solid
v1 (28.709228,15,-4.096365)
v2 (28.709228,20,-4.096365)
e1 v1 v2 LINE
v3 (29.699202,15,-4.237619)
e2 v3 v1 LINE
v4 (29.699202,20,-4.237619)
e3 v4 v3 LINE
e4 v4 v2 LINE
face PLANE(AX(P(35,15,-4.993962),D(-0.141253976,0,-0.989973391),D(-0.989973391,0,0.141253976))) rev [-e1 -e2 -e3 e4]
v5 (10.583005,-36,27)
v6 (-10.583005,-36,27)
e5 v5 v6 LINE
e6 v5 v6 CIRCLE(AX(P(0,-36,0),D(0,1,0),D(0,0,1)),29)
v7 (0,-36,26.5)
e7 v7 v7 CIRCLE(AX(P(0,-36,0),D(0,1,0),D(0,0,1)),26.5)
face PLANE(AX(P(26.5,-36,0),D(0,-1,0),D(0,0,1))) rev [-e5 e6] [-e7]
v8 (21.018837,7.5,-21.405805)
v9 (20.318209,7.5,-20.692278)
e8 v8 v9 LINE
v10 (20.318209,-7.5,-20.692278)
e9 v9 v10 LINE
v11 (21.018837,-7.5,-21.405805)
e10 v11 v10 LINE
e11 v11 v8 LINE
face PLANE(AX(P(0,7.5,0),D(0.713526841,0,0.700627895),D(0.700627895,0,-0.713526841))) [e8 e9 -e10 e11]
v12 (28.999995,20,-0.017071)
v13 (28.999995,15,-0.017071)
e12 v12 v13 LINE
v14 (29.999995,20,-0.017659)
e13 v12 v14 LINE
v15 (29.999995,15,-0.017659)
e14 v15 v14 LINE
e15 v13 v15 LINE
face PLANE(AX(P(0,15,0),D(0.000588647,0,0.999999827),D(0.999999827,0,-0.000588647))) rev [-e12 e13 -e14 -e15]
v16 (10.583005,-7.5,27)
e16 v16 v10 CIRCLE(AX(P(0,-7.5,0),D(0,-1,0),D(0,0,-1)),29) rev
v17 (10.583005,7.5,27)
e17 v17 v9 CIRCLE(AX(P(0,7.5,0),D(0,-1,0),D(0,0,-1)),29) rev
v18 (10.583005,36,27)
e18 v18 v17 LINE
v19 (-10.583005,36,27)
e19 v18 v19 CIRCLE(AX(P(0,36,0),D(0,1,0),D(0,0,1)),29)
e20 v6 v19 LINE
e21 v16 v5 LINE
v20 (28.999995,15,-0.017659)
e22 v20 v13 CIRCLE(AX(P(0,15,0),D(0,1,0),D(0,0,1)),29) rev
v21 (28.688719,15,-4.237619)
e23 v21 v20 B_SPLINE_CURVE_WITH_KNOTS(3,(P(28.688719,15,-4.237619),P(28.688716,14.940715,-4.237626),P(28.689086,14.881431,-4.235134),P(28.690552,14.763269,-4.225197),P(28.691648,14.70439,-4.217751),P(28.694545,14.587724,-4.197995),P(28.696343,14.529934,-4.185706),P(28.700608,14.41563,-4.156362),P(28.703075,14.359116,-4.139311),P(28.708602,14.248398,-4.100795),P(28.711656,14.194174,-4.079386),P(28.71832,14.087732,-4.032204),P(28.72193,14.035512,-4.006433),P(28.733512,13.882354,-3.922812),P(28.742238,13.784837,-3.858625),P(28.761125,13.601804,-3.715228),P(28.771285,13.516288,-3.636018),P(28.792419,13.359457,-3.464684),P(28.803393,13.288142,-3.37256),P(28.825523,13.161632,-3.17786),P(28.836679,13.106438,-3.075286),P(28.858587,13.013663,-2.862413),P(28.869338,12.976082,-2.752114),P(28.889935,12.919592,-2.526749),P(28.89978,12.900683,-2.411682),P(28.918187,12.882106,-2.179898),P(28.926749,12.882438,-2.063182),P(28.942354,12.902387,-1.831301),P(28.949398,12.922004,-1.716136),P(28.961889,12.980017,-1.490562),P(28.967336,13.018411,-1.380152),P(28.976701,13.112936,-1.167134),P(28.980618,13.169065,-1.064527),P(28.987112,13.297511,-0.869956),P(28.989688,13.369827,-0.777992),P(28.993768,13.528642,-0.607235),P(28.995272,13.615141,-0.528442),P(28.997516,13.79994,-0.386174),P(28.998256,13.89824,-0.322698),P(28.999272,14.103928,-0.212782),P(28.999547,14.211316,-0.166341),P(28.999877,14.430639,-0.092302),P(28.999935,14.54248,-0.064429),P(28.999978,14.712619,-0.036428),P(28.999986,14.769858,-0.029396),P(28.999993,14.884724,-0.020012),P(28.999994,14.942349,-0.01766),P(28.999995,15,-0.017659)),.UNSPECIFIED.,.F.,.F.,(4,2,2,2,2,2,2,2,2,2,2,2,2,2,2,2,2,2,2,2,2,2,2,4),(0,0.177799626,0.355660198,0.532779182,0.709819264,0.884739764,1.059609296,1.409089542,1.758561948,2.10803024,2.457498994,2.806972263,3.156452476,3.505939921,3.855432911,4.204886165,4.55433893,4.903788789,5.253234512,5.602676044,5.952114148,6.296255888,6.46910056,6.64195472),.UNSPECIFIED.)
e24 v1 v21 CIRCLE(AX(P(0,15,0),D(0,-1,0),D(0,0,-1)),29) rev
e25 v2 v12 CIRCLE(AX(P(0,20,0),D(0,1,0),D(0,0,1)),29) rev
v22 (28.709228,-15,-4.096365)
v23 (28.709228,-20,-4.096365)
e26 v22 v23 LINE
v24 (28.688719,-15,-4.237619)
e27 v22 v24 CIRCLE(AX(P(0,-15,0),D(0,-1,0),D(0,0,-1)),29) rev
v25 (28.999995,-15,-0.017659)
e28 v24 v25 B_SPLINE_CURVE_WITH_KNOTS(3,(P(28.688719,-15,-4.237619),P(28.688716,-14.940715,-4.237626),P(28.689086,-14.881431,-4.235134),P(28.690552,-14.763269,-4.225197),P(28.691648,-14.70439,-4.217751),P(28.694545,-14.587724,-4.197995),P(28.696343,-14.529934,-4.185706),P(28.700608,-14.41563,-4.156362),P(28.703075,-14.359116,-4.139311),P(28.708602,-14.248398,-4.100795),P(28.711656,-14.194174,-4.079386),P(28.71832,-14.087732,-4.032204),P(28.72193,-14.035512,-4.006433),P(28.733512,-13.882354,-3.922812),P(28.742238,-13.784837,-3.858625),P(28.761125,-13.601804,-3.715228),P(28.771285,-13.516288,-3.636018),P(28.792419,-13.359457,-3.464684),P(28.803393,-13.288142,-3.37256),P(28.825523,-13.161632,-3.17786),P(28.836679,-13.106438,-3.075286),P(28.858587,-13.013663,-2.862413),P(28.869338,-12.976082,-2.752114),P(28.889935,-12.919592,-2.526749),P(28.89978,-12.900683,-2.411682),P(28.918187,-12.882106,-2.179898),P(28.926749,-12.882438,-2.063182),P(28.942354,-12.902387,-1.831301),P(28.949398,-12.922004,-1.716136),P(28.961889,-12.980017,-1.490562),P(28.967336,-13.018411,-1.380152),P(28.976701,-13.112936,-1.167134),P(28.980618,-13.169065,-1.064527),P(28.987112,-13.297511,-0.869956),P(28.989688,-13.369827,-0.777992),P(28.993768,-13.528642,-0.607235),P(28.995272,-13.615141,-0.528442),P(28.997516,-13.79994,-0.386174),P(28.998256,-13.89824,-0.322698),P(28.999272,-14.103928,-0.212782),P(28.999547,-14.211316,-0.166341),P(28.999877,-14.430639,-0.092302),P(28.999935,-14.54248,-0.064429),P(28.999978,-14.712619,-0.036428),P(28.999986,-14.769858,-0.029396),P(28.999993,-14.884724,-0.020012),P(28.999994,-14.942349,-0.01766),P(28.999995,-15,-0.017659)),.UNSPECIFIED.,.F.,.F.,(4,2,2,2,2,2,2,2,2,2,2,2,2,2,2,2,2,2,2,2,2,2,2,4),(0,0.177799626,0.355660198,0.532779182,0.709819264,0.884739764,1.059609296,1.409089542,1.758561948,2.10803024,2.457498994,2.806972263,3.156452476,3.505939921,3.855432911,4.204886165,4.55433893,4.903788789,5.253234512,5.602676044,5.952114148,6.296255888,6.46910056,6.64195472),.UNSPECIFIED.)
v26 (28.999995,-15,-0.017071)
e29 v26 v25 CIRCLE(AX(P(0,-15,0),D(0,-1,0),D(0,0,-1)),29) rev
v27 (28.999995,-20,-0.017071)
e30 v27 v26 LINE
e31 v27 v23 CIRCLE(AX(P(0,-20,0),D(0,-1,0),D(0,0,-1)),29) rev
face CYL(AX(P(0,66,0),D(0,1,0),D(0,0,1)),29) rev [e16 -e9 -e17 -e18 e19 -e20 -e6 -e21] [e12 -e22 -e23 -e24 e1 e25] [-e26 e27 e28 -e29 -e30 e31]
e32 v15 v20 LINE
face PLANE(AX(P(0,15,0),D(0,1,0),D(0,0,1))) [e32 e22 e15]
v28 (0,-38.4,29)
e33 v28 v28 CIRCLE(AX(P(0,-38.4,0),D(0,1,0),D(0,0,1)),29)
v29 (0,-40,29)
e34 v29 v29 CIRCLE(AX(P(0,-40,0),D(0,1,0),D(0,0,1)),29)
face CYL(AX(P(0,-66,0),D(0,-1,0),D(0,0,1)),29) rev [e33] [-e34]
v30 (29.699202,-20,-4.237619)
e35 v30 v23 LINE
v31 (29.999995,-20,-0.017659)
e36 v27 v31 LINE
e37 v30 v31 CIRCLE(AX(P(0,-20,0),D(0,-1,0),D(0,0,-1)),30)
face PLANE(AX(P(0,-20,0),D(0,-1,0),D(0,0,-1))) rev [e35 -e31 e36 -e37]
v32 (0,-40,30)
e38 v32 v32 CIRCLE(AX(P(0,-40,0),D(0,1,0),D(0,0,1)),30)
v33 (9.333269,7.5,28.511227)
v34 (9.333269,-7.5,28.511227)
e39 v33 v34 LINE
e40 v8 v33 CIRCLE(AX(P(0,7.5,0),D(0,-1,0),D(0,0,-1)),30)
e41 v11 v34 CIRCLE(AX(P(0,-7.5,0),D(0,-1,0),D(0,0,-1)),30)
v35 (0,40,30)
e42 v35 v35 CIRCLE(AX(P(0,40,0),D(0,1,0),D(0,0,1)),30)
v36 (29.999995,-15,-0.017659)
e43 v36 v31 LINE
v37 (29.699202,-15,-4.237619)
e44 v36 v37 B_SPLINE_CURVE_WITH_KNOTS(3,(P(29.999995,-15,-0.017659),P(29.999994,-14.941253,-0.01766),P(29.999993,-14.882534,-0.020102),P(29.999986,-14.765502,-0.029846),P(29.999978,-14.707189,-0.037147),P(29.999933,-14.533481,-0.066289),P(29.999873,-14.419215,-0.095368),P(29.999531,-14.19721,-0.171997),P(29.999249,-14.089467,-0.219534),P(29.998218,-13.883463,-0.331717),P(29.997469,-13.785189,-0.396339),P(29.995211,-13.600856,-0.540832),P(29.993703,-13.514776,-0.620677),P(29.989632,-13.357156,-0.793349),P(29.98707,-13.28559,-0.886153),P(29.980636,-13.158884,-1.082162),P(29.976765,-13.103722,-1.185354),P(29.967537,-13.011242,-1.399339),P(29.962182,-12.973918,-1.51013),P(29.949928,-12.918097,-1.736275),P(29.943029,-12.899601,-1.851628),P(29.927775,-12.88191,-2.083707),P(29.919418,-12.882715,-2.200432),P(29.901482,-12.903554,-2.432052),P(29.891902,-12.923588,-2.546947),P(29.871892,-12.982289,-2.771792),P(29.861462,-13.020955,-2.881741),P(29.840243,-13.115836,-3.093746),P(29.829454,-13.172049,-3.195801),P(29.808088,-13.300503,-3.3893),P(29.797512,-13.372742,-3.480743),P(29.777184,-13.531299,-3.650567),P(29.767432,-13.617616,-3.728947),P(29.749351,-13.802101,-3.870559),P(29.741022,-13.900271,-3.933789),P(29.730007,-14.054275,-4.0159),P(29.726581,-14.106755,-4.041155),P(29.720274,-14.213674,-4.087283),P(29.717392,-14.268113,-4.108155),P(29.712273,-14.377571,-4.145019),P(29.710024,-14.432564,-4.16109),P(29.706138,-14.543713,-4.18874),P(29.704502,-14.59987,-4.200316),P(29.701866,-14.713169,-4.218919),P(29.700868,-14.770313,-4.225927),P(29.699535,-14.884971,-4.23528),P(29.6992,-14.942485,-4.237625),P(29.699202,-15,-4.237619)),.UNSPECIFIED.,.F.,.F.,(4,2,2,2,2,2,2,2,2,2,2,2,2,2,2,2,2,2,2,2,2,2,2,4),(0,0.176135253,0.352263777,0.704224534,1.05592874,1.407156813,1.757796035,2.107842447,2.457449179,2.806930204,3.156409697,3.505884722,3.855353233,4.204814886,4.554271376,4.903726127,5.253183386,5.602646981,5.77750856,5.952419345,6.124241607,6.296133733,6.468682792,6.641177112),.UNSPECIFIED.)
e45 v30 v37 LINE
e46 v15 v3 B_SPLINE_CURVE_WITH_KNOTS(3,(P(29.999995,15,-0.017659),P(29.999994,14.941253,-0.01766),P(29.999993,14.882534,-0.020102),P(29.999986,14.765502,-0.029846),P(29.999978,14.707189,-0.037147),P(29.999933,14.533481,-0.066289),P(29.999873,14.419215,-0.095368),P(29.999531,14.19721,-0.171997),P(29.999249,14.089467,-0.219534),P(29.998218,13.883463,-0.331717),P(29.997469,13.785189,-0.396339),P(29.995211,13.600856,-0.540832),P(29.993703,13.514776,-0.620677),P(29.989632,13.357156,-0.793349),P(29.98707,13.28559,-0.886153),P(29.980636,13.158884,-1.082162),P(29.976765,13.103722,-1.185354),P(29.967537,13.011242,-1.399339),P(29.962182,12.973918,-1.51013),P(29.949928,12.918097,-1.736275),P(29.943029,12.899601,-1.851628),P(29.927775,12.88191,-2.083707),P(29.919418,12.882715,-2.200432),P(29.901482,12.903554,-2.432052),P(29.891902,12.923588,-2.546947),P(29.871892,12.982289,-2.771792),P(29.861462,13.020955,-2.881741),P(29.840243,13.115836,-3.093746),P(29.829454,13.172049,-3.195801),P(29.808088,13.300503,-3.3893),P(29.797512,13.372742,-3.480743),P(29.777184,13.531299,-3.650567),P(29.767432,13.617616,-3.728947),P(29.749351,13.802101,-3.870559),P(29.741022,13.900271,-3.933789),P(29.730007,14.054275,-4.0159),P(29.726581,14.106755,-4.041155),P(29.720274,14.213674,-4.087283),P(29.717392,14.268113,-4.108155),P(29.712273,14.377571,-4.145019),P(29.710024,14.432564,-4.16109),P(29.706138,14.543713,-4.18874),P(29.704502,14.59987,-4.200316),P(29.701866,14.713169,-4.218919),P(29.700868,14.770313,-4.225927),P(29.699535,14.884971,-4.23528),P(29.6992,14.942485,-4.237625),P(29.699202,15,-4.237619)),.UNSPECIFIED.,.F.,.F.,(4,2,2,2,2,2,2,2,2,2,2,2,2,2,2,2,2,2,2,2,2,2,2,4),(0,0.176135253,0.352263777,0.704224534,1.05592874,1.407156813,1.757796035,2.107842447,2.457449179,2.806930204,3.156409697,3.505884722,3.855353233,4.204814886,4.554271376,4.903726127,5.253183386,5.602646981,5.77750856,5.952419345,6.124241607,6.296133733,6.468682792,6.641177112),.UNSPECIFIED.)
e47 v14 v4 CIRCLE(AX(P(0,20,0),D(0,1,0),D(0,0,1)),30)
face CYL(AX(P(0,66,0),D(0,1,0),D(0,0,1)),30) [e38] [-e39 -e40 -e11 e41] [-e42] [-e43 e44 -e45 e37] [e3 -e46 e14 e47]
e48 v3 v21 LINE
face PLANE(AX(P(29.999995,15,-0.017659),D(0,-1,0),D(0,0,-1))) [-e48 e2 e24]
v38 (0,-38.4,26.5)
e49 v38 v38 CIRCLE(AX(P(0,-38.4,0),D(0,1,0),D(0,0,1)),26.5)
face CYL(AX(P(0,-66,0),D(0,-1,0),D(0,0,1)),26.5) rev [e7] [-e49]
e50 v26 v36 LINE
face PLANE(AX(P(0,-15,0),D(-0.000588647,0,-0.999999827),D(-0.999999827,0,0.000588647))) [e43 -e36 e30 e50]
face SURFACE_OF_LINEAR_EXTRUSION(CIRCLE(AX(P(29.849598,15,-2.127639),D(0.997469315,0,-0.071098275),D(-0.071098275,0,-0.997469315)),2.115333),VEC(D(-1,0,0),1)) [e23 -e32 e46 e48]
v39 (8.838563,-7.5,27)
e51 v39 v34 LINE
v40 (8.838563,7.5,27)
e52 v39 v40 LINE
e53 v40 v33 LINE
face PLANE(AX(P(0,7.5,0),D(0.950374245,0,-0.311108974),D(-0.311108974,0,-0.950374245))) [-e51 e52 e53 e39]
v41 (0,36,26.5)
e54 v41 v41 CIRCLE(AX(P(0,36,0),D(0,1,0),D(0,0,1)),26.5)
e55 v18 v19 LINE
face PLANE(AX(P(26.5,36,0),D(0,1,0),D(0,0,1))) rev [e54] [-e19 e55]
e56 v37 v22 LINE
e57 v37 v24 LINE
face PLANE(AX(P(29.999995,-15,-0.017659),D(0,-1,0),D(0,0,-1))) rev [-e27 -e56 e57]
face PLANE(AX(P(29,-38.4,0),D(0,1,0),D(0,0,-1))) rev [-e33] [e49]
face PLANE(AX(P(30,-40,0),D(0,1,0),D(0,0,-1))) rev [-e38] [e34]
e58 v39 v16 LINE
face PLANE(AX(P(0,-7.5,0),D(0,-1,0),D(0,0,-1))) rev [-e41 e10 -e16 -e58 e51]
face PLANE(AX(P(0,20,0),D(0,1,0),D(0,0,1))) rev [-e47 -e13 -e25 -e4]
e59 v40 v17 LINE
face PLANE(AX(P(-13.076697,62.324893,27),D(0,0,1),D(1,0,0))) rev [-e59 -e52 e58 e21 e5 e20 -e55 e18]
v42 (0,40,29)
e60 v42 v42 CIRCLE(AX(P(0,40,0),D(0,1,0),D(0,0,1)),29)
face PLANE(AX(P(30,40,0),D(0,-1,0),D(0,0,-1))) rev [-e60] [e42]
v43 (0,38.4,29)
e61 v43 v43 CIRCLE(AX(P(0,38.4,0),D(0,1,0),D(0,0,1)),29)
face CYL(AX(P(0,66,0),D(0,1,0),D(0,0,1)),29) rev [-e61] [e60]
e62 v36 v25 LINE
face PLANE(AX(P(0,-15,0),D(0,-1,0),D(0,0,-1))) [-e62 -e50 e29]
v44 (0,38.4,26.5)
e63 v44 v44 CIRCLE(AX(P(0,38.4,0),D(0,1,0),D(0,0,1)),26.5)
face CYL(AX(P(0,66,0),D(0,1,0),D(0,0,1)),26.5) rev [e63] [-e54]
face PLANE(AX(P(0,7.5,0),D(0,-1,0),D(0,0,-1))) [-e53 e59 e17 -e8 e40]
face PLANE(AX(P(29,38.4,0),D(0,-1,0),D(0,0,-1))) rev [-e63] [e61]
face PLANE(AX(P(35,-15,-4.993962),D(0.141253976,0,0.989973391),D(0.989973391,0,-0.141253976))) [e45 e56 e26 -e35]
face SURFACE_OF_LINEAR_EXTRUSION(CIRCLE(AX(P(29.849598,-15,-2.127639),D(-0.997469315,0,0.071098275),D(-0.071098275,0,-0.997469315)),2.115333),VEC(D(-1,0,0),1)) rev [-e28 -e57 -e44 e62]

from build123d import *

# Parameters (mm, degrees)
EXTRUDE_11_REACH             = 60.31
EXTRUDE_11_DIRECTION_2_REACH = 60.31
CUT_EXTRUDE_1_DEPTH          = 7.5
CUT_EXTRUDE_1_DEPTH_BACK     = 7.5
CUT_EXTRUDE_2_DEPTH          = 5
CUT_EXTRUDE_START            = 28.688718626
CUT_EXTRUDE_3_DEPTH          = 1.311276176


# Read off the part's stored shape, not the designer's step: 切除-拉伸3
with BuildPart() as part:
    # 草图1 → 旋转1 (revolve)
    with BuildSketch(Plane.XY, mode=Mode.PRIVATE) as revolve_1_sk:
        Polygon((26.5, 38.4), (26.5, 36), (29, 36), (29, 0), (30, 0), (30, 40), (29, 40), (29, 38.4), align=None)
    revolve_1 = revolve(revolve_1_sk.sketch.rotate(Axis((0, 66, 0), (0, -1, 0)), 90), axis=Axis((0, 66, 0), (0, -1, 0)))

    # 镜向1: 旋转1 across plane
    add(revolve_1.mirror(Plane.ZX))

    # 凸台-拉伸11: up to this face of the body (flat: up to its plane)
    extrude_11_end = Plane(part.part.faces().sort_by_distance((0, 36, -27.320243866))[0])
    # 草图11 → 凸台-拉伸11 (add, up to the picked face)
    with BuildSketch(Plane(origin=(0, 0, 0), x_dir=(1, 0, 0), z_dir=(0, 1, 0)), mode=Mode.PRIVATE) as extrude_11_sk1:
        with BuildLine():
            Line((-13.076696831, -27), (13.076696831, -27))
            ThreePointArc((13.076696831, -27), (0, -30), (-13.076696831, -27))
        make_face()
    extrude_11_tool1 = split(extrude(extrude_11_sk1.sketch, amount=EXTRUDE_11_REACH, mode=Mode.PRIVATE), bisect_by=extrude_11_end, keep=Keep.BOTH, mode=Mode.PRIVATE)
    add(extrude_11_tool1.solids().sort_by(Axis((0, 0, 28.205296), (0, 1, 0)))[0])

    # 凸台-拉伸11 direction 2: up to this face of the body (flat: up to its plane)
    extrude_11_direction_2_end = Plane(part.part.faces().sort_by_distance((0, -36, -27.320243866))[0])
    # 草图11 → 凸台-拉伸11 direction 2 (add, up to the picked face)
    with BuildSketch(Plane(origin=(0, 0, 0), x_dir=(1, 0, 0), z_dir=(0, 1, 0)), mode=Mode.PRIVATE) as extrude_11_direction_2_sk1:
        with BuildLine():
            Line((-13.076696831, -27), (13.076696831, -27))
            ThreePointArc((13.076696831, -27), (0, -30), (-13.076696831, -27))
        make_face()
    extrude_11_direction_2_tool1 = split(extrude(extrude_11_direction_2_sk1.sketch, amount=-EXTRUDE_11_DIRECTION_2_REACH, mode=Mode.PRIVATE), bisect_by=extrude_11_direction_2_end, keep=Keep.BOTH, mode=Mode.PRIVATE)
    add(extrude_11_direction_2_tool1.solids().sort_by(Axis((0, 0, 28.205296), (0, -1, 0)))[0])

    # 草图12 → 切除-拉伸1 (cut, two sides: drawn at the far end of the back side and taken through both)
    with BuildSketch(Plane(origin=(0, 0, 0), x_dir=(1, 0, 0), z_dir=(0, 1, 0)).offset(-CUT_EXTRUDE_1_DEPTH_BACK)):
        with BuildLine():
            Line((0, 0), (22.520337054, 22.934948885))
            ThreePointArc((22.520337054, 22.934948885), (31.296937417, -7.32660697), (10, -30.547953473))
            Line((10, -30.547953473), (0, 0))
        make_face()
    extrude(amount=CUT_EXTRUDE_1_DEPTH + CUT_EXTRUDE_1_DEPTH_BACK, mode=Mode.SUBTRACT)

    # Sketch 3D_2 → 切除-拉伸2 (cut)
    with BuildSketch(Plane(origin=(35, 15, -4.993961669), x_dir=(-0.989973390659655, 0, 0.1412539761770484), z_dir=(0, 1, 0))):
        with BuildLine():
            Line((0, 0), (35.354485616, 0))
            Line((35.354485616, 0), (0.330334968, 4.976372773))
            ThreePointArc((0.330334968, 4.976372773), (0.075684949, 2.494126297), (0, 0))
        make_face()
    cut_extrude_2 = extrude(amount=CUT_EXTRUDE_2_DEPTH, mode=Mode.SUBTRACT)

    # 镜向2: 切除-拉伸2 across plane
    add(cut_extrude_2.mirror(Plane.ZX), mode=Mode.SUBTRACT)

    # 切除-拉伸3 outline → 切除-拉伸3 (cut)
    with BuildSketch(Plane.YZ.offset(CUT_EXTRUDE_START)):
        with BuildLine():
            Line((15, -4.237619285), (15, -0.017659399))
            add(Edge.make_bspline(
                [(15, -0.017659399), (12.884666816, -0.017659399), (12.884666816, -2.127639342), (12.884666816, -4.237619285), (15, -4.237619285)],
                knots=[3.141592654, 3.141592654, 3.141592654, 4.71238898, 4.71238898, 6.283185307, 6.283185307, 6.283185307], degree=2, weights=[1, 0.707106781, 1, 0.707106781, 1]))
        make_face()
    cut_extrude_3 = extrude(amount=CUT_EXTRUDE_3_DEPTH, mode=Mode.SUBTRACT)

    # 镜向3: 切除-拉伸3 across plane
    add(cut_extrude_3.mirror(Plane.ZX), mode=Mode.SUBTRACT)


solid = part.part
